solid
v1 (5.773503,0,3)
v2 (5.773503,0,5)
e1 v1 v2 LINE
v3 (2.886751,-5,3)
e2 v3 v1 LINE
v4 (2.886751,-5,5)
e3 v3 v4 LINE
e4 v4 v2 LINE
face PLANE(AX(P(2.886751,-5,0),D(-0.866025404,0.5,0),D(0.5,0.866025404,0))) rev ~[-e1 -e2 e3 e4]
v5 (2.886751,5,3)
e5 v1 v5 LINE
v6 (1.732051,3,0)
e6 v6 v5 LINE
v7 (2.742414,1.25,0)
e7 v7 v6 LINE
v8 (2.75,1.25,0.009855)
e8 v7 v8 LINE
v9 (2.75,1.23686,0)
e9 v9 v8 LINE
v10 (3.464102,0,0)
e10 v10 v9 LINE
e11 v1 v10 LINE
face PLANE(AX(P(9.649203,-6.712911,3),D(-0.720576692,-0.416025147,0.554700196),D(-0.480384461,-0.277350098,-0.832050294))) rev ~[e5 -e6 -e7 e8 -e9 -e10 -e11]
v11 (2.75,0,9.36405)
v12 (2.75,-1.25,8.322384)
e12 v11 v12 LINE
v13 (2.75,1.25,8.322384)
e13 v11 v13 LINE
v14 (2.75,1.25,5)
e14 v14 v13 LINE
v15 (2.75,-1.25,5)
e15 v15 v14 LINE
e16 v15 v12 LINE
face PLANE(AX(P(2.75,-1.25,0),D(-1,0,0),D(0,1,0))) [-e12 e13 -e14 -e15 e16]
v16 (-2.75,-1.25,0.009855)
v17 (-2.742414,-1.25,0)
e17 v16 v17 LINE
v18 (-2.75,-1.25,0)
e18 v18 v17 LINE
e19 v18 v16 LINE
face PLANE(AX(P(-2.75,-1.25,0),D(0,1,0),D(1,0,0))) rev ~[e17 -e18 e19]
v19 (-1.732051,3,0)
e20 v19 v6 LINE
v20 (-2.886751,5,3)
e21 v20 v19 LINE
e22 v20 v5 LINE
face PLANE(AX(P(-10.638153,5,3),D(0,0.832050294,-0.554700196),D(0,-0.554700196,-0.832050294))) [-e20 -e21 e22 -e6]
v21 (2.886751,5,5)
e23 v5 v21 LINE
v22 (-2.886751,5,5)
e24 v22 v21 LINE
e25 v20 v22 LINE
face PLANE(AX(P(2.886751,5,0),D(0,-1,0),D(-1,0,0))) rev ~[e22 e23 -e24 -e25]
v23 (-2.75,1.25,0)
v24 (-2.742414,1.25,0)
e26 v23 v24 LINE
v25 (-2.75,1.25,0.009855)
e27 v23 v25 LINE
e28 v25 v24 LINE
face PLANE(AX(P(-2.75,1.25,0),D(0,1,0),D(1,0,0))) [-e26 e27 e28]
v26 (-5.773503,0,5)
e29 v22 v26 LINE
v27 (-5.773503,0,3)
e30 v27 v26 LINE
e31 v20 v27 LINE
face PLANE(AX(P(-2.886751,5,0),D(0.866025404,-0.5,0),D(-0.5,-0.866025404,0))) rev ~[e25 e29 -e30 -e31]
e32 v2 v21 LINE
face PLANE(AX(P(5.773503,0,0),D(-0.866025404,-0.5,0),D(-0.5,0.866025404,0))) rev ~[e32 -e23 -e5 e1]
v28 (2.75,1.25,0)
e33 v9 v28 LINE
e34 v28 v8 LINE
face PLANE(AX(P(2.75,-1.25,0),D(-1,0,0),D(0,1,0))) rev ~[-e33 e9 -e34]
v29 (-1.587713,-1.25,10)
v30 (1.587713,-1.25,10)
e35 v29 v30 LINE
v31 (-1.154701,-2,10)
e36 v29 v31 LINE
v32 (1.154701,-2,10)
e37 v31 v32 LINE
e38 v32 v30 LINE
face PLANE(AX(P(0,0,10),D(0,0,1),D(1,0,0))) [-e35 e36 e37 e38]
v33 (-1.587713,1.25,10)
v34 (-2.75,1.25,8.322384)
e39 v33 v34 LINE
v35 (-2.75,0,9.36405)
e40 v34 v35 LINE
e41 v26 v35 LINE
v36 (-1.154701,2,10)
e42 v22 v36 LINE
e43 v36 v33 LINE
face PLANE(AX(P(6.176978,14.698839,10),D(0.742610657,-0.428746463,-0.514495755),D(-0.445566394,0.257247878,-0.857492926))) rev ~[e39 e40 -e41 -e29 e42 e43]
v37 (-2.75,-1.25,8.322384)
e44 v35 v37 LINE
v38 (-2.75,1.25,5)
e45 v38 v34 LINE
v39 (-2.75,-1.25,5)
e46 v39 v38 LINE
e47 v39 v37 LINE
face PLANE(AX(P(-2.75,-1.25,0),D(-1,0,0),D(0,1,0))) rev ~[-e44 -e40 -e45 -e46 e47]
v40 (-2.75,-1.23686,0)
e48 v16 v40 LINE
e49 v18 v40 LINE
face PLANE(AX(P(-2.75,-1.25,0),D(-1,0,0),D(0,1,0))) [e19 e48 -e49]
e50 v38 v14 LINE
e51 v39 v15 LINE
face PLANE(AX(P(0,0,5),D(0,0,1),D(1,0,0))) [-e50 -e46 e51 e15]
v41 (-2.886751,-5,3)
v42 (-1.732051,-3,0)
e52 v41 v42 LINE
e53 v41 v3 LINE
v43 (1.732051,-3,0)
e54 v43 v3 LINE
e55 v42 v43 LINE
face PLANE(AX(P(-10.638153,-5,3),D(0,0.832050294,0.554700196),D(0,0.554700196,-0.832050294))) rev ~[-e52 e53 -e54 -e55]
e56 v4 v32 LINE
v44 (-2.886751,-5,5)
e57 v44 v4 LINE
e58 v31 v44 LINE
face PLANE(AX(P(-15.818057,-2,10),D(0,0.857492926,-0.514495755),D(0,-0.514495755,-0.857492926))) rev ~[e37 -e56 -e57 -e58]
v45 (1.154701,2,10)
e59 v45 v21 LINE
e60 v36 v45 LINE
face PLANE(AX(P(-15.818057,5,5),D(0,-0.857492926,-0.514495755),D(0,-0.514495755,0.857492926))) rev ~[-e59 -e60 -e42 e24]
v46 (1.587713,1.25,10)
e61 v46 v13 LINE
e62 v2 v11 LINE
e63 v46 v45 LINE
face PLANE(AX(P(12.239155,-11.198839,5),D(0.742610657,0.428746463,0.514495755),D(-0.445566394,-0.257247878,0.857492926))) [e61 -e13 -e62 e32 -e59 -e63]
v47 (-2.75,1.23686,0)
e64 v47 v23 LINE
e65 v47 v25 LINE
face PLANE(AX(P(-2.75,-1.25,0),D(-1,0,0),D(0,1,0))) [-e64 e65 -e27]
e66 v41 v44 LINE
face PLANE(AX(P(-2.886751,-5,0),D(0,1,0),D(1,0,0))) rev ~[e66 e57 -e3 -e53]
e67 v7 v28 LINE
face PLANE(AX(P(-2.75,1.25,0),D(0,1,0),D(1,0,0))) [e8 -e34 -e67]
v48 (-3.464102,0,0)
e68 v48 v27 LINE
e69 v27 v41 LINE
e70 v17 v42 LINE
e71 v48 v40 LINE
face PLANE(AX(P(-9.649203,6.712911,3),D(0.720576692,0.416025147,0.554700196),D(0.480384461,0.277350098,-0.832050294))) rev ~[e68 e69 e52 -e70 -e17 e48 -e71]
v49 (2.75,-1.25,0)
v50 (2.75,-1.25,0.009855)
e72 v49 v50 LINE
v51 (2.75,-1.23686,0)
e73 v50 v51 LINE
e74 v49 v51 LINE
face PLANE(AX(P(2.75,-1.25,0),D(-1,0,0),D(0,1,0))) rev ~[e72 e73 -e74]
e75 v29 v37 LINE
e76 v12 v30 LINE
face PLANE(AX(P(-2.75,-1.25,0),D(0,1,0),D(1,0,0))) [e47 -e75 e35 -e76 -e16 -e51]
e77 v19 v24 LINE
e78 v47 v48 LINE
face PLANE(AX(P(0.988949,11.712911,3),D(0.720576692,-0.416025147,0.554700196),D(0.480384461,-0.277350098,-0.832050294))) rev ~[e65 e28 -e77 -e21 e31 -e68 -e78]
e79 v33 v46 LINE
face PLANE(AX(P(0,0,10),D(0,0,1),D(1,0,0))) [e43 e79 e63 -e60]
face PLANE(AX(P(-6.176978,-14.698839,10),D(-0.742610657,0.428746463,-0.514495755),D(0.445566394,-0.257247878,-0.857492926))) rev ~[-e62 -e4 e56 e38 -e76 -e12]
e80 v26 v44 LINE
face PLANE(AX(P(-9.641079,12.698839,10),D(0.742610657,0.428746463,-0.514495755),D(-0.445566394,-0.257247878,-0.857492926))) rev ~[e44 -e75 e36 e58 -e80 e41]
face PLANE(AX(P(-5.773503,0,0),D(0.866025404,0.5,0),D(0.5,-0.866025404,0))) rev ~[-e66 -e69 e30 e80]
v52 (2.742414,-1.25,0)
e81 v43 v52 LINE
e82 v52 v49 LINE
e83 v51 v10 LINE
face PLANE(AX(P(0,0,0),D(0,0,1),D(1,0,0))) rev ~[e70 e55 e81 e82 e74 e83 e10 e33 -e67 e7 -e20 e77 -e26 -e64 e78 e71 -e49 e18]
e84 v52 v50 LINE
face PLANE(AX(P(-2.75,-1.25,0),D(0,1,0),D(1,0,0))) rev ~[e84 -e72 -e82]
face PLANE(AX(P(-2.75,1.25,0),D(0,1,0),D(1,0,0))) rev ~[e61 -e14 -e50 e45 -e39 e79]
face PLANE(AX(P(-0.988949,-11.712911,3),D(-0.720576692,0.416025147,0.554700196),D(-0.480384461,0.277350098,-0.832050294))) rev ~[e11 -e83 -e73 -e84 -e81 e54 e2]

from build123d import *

# Parameters (mm, degrees)
F0_W        = 5.5
F0_H        = 2.5
F1_DEPTH    = 10
F2_T1_DEPTH = 21.2763058351
F2_T3_DEPTH = 21.2763058351
F2_T5_DEPTH = 21.2763058351
F2_T7_DEPTH = 21.2763058351
F2_T9_DEPTH = 21.2763058351
F3_T1_DEPTH = 31.6361136638
F3_T3_DEPTH = 31.6361136638
F3_T5_DEPTH = 31.6361136638
F3_T7_DEPTH = 31.6361136638
F3_T9_DEPTH = 31.6361136638
F4_DEPTH    = 5


# Not quite as in the source:
# - a fillet or chamfer that OpenCascade refuses, or shapes differently, is made with other operations: its cross-section is extruded or revolved along the edge and cut away or added


with BuildPart() as f1:
    # F0 (on Top) → F1 (new body)
    with BuildSketch(Plane.XY):
        Polygon((2.8867513459, 5), (-2.8867513459, 5), (-5.7735026919, 0), (-2.8867513459, -5), (2.8867513459, -5), (5.7735026919, 0), align=None)
        Rectangle(F0_W, F0_H, mode=Mode.SUBTRACT)
    extrude(amount=F1_DEPTH)

    # F2: chamfer of 2 x 3 on 6 edges, made by hand

    # F2_s2 → F2_t1 (cut)
    with BuildSketch(Plane.YZ.offset(-10.6381529176)):
        Polygon((5, 3), (3, 0), (5, 0), align=None)
        Polygon((-5, 3), (-3, 0), (-5, 0), align=None)
    extrude(amount=F2_T1_DEPTH, mode=Mode.SUBTRACT)

    # F2_s4 → F2_t3 (cut)
    with BuildSketch(Plane(origin=(5.3190764588, -9.212910676, 0), x_dir=(0, 0, 1), z_dir=(-0.5, 0.8660254038, 0))):
        Polygon((3, 5), (0, 3), (0, 5), align=None)
    extrude(amount=F2_T3_DEPTH, mode=Mode.SUBTRACT)

    # F2_s6 → F2_t5 (cut)
    with BuildSketch(Plane(origin=(5.3190764588, 9.212910676, 0), x_dir=(0, 0, 1), z_dir=(-0.5, -0.8660254038, 0))):
        Polygon((3, 5), (0, 3), (0, 5), align=None)
    extrude(amount=F2_T5_DEPTH, mode=Mode.SUBTRACT)

    # F2_s8 → F2_t7 (cut)
    with BuildSketch(Plane(origin=(-5.3190764588, 9.212910676, 0), x_dir=(0, 0, 1), z_dir=(0.5, -0.8660254038, 0))):
        Polygon((3, 5), (0, 3), (0, 5), align=None)
    extrude(amount=F2_T7_DEPTH, mode=Mode.SUBTRACT)

    # F2_s10 → F2_t9 (cut)
    with BuildSketch(Plane(origin=(-5.3190764588, -9.212910676, 0), x_dir=(0, 0, 1), z_dir=(0.5, 0.8660254038, 0))):
        Polygon((3, 5), (0, 3), (0, 5), align=None)
    extrude(amount=F2_T9_DEPTH, mode=Mode.SUBTRACT)

    # F3: chamfer of 5 x 3 on 6 edges, made by hand

    # F3_s2 → F3_t1 (cut)
    with BuildSketch(Plane(origin=(7.909028416, -13.6988390549, 0), x_dir=(0, 0, 1), z_dir=(-0.5, 0.8660254038, 0))):
        Polygon((5, 5), (10, 2), (10, 5), align=None)
    extrude(amount=F3_T1_DEPTH, mode=Mode.SUBTRACT)

    # F3_s4 → F3_t3 (cut)
    with BuildSketch(Plane.YZ.offset(-15.8180568319)):
        Polygon((5, 5), (2, 10), (5, 10), align=None)
        Polygon((-2, 10), (-5, 5), (-5, 10), align=None)
    extrude(amount=F3_T3_DEPTH, mode=Mode.SUBTRACT)

    # F3_s6 → F3_t5 (cut)
    with BuildSketch(Plane(origin=(7.909028416, 13.6988390549, 0), x_dir=(0, 0, 1), z_dir=(-0.5, -0.8660254038, 0))):
        Polygon((10, 2), (5, 5), (10, 5), align=None)
    extrude(amount=F3_T5_DEPTH, mode=Mode.SUBTRACT)

    # F3_s8 → F3_t7 (cut)
    with BuildSketch(Plane(origin=(-7.909028416, 13.6988390549, 0), x_dir=(0, 0, 1), z_dir=(0.5, -0.8660254038, 0))):
        Polygon((10, 2), (5, 5), (10, 5), align=None)
    extrude(amount=F3_T7_DEPTH, mode=Mode.SUBTRACT)

    # F3_s10 → F3_t9 (cut)
    with BuildSketch(Plane(origin=(-7.909028416, -13.6988390549, 0), x_dir=(0, 0, 1), z_dir=(0.5, 0.8660254038, 0))):
        Polygon((10, 2), (5, 5), (10, 5), align=None)
    extrude(amount=F3_T9_DEPTH, mode=Mode.SUBTRACT)

    # F0 (on Top) → F4 (join)
    with BuildSketch(Plane.XY):
        Rectangle(F0_W, F0_H)
    extrude(amount=F4_DEPTH)


solid = f1.part
